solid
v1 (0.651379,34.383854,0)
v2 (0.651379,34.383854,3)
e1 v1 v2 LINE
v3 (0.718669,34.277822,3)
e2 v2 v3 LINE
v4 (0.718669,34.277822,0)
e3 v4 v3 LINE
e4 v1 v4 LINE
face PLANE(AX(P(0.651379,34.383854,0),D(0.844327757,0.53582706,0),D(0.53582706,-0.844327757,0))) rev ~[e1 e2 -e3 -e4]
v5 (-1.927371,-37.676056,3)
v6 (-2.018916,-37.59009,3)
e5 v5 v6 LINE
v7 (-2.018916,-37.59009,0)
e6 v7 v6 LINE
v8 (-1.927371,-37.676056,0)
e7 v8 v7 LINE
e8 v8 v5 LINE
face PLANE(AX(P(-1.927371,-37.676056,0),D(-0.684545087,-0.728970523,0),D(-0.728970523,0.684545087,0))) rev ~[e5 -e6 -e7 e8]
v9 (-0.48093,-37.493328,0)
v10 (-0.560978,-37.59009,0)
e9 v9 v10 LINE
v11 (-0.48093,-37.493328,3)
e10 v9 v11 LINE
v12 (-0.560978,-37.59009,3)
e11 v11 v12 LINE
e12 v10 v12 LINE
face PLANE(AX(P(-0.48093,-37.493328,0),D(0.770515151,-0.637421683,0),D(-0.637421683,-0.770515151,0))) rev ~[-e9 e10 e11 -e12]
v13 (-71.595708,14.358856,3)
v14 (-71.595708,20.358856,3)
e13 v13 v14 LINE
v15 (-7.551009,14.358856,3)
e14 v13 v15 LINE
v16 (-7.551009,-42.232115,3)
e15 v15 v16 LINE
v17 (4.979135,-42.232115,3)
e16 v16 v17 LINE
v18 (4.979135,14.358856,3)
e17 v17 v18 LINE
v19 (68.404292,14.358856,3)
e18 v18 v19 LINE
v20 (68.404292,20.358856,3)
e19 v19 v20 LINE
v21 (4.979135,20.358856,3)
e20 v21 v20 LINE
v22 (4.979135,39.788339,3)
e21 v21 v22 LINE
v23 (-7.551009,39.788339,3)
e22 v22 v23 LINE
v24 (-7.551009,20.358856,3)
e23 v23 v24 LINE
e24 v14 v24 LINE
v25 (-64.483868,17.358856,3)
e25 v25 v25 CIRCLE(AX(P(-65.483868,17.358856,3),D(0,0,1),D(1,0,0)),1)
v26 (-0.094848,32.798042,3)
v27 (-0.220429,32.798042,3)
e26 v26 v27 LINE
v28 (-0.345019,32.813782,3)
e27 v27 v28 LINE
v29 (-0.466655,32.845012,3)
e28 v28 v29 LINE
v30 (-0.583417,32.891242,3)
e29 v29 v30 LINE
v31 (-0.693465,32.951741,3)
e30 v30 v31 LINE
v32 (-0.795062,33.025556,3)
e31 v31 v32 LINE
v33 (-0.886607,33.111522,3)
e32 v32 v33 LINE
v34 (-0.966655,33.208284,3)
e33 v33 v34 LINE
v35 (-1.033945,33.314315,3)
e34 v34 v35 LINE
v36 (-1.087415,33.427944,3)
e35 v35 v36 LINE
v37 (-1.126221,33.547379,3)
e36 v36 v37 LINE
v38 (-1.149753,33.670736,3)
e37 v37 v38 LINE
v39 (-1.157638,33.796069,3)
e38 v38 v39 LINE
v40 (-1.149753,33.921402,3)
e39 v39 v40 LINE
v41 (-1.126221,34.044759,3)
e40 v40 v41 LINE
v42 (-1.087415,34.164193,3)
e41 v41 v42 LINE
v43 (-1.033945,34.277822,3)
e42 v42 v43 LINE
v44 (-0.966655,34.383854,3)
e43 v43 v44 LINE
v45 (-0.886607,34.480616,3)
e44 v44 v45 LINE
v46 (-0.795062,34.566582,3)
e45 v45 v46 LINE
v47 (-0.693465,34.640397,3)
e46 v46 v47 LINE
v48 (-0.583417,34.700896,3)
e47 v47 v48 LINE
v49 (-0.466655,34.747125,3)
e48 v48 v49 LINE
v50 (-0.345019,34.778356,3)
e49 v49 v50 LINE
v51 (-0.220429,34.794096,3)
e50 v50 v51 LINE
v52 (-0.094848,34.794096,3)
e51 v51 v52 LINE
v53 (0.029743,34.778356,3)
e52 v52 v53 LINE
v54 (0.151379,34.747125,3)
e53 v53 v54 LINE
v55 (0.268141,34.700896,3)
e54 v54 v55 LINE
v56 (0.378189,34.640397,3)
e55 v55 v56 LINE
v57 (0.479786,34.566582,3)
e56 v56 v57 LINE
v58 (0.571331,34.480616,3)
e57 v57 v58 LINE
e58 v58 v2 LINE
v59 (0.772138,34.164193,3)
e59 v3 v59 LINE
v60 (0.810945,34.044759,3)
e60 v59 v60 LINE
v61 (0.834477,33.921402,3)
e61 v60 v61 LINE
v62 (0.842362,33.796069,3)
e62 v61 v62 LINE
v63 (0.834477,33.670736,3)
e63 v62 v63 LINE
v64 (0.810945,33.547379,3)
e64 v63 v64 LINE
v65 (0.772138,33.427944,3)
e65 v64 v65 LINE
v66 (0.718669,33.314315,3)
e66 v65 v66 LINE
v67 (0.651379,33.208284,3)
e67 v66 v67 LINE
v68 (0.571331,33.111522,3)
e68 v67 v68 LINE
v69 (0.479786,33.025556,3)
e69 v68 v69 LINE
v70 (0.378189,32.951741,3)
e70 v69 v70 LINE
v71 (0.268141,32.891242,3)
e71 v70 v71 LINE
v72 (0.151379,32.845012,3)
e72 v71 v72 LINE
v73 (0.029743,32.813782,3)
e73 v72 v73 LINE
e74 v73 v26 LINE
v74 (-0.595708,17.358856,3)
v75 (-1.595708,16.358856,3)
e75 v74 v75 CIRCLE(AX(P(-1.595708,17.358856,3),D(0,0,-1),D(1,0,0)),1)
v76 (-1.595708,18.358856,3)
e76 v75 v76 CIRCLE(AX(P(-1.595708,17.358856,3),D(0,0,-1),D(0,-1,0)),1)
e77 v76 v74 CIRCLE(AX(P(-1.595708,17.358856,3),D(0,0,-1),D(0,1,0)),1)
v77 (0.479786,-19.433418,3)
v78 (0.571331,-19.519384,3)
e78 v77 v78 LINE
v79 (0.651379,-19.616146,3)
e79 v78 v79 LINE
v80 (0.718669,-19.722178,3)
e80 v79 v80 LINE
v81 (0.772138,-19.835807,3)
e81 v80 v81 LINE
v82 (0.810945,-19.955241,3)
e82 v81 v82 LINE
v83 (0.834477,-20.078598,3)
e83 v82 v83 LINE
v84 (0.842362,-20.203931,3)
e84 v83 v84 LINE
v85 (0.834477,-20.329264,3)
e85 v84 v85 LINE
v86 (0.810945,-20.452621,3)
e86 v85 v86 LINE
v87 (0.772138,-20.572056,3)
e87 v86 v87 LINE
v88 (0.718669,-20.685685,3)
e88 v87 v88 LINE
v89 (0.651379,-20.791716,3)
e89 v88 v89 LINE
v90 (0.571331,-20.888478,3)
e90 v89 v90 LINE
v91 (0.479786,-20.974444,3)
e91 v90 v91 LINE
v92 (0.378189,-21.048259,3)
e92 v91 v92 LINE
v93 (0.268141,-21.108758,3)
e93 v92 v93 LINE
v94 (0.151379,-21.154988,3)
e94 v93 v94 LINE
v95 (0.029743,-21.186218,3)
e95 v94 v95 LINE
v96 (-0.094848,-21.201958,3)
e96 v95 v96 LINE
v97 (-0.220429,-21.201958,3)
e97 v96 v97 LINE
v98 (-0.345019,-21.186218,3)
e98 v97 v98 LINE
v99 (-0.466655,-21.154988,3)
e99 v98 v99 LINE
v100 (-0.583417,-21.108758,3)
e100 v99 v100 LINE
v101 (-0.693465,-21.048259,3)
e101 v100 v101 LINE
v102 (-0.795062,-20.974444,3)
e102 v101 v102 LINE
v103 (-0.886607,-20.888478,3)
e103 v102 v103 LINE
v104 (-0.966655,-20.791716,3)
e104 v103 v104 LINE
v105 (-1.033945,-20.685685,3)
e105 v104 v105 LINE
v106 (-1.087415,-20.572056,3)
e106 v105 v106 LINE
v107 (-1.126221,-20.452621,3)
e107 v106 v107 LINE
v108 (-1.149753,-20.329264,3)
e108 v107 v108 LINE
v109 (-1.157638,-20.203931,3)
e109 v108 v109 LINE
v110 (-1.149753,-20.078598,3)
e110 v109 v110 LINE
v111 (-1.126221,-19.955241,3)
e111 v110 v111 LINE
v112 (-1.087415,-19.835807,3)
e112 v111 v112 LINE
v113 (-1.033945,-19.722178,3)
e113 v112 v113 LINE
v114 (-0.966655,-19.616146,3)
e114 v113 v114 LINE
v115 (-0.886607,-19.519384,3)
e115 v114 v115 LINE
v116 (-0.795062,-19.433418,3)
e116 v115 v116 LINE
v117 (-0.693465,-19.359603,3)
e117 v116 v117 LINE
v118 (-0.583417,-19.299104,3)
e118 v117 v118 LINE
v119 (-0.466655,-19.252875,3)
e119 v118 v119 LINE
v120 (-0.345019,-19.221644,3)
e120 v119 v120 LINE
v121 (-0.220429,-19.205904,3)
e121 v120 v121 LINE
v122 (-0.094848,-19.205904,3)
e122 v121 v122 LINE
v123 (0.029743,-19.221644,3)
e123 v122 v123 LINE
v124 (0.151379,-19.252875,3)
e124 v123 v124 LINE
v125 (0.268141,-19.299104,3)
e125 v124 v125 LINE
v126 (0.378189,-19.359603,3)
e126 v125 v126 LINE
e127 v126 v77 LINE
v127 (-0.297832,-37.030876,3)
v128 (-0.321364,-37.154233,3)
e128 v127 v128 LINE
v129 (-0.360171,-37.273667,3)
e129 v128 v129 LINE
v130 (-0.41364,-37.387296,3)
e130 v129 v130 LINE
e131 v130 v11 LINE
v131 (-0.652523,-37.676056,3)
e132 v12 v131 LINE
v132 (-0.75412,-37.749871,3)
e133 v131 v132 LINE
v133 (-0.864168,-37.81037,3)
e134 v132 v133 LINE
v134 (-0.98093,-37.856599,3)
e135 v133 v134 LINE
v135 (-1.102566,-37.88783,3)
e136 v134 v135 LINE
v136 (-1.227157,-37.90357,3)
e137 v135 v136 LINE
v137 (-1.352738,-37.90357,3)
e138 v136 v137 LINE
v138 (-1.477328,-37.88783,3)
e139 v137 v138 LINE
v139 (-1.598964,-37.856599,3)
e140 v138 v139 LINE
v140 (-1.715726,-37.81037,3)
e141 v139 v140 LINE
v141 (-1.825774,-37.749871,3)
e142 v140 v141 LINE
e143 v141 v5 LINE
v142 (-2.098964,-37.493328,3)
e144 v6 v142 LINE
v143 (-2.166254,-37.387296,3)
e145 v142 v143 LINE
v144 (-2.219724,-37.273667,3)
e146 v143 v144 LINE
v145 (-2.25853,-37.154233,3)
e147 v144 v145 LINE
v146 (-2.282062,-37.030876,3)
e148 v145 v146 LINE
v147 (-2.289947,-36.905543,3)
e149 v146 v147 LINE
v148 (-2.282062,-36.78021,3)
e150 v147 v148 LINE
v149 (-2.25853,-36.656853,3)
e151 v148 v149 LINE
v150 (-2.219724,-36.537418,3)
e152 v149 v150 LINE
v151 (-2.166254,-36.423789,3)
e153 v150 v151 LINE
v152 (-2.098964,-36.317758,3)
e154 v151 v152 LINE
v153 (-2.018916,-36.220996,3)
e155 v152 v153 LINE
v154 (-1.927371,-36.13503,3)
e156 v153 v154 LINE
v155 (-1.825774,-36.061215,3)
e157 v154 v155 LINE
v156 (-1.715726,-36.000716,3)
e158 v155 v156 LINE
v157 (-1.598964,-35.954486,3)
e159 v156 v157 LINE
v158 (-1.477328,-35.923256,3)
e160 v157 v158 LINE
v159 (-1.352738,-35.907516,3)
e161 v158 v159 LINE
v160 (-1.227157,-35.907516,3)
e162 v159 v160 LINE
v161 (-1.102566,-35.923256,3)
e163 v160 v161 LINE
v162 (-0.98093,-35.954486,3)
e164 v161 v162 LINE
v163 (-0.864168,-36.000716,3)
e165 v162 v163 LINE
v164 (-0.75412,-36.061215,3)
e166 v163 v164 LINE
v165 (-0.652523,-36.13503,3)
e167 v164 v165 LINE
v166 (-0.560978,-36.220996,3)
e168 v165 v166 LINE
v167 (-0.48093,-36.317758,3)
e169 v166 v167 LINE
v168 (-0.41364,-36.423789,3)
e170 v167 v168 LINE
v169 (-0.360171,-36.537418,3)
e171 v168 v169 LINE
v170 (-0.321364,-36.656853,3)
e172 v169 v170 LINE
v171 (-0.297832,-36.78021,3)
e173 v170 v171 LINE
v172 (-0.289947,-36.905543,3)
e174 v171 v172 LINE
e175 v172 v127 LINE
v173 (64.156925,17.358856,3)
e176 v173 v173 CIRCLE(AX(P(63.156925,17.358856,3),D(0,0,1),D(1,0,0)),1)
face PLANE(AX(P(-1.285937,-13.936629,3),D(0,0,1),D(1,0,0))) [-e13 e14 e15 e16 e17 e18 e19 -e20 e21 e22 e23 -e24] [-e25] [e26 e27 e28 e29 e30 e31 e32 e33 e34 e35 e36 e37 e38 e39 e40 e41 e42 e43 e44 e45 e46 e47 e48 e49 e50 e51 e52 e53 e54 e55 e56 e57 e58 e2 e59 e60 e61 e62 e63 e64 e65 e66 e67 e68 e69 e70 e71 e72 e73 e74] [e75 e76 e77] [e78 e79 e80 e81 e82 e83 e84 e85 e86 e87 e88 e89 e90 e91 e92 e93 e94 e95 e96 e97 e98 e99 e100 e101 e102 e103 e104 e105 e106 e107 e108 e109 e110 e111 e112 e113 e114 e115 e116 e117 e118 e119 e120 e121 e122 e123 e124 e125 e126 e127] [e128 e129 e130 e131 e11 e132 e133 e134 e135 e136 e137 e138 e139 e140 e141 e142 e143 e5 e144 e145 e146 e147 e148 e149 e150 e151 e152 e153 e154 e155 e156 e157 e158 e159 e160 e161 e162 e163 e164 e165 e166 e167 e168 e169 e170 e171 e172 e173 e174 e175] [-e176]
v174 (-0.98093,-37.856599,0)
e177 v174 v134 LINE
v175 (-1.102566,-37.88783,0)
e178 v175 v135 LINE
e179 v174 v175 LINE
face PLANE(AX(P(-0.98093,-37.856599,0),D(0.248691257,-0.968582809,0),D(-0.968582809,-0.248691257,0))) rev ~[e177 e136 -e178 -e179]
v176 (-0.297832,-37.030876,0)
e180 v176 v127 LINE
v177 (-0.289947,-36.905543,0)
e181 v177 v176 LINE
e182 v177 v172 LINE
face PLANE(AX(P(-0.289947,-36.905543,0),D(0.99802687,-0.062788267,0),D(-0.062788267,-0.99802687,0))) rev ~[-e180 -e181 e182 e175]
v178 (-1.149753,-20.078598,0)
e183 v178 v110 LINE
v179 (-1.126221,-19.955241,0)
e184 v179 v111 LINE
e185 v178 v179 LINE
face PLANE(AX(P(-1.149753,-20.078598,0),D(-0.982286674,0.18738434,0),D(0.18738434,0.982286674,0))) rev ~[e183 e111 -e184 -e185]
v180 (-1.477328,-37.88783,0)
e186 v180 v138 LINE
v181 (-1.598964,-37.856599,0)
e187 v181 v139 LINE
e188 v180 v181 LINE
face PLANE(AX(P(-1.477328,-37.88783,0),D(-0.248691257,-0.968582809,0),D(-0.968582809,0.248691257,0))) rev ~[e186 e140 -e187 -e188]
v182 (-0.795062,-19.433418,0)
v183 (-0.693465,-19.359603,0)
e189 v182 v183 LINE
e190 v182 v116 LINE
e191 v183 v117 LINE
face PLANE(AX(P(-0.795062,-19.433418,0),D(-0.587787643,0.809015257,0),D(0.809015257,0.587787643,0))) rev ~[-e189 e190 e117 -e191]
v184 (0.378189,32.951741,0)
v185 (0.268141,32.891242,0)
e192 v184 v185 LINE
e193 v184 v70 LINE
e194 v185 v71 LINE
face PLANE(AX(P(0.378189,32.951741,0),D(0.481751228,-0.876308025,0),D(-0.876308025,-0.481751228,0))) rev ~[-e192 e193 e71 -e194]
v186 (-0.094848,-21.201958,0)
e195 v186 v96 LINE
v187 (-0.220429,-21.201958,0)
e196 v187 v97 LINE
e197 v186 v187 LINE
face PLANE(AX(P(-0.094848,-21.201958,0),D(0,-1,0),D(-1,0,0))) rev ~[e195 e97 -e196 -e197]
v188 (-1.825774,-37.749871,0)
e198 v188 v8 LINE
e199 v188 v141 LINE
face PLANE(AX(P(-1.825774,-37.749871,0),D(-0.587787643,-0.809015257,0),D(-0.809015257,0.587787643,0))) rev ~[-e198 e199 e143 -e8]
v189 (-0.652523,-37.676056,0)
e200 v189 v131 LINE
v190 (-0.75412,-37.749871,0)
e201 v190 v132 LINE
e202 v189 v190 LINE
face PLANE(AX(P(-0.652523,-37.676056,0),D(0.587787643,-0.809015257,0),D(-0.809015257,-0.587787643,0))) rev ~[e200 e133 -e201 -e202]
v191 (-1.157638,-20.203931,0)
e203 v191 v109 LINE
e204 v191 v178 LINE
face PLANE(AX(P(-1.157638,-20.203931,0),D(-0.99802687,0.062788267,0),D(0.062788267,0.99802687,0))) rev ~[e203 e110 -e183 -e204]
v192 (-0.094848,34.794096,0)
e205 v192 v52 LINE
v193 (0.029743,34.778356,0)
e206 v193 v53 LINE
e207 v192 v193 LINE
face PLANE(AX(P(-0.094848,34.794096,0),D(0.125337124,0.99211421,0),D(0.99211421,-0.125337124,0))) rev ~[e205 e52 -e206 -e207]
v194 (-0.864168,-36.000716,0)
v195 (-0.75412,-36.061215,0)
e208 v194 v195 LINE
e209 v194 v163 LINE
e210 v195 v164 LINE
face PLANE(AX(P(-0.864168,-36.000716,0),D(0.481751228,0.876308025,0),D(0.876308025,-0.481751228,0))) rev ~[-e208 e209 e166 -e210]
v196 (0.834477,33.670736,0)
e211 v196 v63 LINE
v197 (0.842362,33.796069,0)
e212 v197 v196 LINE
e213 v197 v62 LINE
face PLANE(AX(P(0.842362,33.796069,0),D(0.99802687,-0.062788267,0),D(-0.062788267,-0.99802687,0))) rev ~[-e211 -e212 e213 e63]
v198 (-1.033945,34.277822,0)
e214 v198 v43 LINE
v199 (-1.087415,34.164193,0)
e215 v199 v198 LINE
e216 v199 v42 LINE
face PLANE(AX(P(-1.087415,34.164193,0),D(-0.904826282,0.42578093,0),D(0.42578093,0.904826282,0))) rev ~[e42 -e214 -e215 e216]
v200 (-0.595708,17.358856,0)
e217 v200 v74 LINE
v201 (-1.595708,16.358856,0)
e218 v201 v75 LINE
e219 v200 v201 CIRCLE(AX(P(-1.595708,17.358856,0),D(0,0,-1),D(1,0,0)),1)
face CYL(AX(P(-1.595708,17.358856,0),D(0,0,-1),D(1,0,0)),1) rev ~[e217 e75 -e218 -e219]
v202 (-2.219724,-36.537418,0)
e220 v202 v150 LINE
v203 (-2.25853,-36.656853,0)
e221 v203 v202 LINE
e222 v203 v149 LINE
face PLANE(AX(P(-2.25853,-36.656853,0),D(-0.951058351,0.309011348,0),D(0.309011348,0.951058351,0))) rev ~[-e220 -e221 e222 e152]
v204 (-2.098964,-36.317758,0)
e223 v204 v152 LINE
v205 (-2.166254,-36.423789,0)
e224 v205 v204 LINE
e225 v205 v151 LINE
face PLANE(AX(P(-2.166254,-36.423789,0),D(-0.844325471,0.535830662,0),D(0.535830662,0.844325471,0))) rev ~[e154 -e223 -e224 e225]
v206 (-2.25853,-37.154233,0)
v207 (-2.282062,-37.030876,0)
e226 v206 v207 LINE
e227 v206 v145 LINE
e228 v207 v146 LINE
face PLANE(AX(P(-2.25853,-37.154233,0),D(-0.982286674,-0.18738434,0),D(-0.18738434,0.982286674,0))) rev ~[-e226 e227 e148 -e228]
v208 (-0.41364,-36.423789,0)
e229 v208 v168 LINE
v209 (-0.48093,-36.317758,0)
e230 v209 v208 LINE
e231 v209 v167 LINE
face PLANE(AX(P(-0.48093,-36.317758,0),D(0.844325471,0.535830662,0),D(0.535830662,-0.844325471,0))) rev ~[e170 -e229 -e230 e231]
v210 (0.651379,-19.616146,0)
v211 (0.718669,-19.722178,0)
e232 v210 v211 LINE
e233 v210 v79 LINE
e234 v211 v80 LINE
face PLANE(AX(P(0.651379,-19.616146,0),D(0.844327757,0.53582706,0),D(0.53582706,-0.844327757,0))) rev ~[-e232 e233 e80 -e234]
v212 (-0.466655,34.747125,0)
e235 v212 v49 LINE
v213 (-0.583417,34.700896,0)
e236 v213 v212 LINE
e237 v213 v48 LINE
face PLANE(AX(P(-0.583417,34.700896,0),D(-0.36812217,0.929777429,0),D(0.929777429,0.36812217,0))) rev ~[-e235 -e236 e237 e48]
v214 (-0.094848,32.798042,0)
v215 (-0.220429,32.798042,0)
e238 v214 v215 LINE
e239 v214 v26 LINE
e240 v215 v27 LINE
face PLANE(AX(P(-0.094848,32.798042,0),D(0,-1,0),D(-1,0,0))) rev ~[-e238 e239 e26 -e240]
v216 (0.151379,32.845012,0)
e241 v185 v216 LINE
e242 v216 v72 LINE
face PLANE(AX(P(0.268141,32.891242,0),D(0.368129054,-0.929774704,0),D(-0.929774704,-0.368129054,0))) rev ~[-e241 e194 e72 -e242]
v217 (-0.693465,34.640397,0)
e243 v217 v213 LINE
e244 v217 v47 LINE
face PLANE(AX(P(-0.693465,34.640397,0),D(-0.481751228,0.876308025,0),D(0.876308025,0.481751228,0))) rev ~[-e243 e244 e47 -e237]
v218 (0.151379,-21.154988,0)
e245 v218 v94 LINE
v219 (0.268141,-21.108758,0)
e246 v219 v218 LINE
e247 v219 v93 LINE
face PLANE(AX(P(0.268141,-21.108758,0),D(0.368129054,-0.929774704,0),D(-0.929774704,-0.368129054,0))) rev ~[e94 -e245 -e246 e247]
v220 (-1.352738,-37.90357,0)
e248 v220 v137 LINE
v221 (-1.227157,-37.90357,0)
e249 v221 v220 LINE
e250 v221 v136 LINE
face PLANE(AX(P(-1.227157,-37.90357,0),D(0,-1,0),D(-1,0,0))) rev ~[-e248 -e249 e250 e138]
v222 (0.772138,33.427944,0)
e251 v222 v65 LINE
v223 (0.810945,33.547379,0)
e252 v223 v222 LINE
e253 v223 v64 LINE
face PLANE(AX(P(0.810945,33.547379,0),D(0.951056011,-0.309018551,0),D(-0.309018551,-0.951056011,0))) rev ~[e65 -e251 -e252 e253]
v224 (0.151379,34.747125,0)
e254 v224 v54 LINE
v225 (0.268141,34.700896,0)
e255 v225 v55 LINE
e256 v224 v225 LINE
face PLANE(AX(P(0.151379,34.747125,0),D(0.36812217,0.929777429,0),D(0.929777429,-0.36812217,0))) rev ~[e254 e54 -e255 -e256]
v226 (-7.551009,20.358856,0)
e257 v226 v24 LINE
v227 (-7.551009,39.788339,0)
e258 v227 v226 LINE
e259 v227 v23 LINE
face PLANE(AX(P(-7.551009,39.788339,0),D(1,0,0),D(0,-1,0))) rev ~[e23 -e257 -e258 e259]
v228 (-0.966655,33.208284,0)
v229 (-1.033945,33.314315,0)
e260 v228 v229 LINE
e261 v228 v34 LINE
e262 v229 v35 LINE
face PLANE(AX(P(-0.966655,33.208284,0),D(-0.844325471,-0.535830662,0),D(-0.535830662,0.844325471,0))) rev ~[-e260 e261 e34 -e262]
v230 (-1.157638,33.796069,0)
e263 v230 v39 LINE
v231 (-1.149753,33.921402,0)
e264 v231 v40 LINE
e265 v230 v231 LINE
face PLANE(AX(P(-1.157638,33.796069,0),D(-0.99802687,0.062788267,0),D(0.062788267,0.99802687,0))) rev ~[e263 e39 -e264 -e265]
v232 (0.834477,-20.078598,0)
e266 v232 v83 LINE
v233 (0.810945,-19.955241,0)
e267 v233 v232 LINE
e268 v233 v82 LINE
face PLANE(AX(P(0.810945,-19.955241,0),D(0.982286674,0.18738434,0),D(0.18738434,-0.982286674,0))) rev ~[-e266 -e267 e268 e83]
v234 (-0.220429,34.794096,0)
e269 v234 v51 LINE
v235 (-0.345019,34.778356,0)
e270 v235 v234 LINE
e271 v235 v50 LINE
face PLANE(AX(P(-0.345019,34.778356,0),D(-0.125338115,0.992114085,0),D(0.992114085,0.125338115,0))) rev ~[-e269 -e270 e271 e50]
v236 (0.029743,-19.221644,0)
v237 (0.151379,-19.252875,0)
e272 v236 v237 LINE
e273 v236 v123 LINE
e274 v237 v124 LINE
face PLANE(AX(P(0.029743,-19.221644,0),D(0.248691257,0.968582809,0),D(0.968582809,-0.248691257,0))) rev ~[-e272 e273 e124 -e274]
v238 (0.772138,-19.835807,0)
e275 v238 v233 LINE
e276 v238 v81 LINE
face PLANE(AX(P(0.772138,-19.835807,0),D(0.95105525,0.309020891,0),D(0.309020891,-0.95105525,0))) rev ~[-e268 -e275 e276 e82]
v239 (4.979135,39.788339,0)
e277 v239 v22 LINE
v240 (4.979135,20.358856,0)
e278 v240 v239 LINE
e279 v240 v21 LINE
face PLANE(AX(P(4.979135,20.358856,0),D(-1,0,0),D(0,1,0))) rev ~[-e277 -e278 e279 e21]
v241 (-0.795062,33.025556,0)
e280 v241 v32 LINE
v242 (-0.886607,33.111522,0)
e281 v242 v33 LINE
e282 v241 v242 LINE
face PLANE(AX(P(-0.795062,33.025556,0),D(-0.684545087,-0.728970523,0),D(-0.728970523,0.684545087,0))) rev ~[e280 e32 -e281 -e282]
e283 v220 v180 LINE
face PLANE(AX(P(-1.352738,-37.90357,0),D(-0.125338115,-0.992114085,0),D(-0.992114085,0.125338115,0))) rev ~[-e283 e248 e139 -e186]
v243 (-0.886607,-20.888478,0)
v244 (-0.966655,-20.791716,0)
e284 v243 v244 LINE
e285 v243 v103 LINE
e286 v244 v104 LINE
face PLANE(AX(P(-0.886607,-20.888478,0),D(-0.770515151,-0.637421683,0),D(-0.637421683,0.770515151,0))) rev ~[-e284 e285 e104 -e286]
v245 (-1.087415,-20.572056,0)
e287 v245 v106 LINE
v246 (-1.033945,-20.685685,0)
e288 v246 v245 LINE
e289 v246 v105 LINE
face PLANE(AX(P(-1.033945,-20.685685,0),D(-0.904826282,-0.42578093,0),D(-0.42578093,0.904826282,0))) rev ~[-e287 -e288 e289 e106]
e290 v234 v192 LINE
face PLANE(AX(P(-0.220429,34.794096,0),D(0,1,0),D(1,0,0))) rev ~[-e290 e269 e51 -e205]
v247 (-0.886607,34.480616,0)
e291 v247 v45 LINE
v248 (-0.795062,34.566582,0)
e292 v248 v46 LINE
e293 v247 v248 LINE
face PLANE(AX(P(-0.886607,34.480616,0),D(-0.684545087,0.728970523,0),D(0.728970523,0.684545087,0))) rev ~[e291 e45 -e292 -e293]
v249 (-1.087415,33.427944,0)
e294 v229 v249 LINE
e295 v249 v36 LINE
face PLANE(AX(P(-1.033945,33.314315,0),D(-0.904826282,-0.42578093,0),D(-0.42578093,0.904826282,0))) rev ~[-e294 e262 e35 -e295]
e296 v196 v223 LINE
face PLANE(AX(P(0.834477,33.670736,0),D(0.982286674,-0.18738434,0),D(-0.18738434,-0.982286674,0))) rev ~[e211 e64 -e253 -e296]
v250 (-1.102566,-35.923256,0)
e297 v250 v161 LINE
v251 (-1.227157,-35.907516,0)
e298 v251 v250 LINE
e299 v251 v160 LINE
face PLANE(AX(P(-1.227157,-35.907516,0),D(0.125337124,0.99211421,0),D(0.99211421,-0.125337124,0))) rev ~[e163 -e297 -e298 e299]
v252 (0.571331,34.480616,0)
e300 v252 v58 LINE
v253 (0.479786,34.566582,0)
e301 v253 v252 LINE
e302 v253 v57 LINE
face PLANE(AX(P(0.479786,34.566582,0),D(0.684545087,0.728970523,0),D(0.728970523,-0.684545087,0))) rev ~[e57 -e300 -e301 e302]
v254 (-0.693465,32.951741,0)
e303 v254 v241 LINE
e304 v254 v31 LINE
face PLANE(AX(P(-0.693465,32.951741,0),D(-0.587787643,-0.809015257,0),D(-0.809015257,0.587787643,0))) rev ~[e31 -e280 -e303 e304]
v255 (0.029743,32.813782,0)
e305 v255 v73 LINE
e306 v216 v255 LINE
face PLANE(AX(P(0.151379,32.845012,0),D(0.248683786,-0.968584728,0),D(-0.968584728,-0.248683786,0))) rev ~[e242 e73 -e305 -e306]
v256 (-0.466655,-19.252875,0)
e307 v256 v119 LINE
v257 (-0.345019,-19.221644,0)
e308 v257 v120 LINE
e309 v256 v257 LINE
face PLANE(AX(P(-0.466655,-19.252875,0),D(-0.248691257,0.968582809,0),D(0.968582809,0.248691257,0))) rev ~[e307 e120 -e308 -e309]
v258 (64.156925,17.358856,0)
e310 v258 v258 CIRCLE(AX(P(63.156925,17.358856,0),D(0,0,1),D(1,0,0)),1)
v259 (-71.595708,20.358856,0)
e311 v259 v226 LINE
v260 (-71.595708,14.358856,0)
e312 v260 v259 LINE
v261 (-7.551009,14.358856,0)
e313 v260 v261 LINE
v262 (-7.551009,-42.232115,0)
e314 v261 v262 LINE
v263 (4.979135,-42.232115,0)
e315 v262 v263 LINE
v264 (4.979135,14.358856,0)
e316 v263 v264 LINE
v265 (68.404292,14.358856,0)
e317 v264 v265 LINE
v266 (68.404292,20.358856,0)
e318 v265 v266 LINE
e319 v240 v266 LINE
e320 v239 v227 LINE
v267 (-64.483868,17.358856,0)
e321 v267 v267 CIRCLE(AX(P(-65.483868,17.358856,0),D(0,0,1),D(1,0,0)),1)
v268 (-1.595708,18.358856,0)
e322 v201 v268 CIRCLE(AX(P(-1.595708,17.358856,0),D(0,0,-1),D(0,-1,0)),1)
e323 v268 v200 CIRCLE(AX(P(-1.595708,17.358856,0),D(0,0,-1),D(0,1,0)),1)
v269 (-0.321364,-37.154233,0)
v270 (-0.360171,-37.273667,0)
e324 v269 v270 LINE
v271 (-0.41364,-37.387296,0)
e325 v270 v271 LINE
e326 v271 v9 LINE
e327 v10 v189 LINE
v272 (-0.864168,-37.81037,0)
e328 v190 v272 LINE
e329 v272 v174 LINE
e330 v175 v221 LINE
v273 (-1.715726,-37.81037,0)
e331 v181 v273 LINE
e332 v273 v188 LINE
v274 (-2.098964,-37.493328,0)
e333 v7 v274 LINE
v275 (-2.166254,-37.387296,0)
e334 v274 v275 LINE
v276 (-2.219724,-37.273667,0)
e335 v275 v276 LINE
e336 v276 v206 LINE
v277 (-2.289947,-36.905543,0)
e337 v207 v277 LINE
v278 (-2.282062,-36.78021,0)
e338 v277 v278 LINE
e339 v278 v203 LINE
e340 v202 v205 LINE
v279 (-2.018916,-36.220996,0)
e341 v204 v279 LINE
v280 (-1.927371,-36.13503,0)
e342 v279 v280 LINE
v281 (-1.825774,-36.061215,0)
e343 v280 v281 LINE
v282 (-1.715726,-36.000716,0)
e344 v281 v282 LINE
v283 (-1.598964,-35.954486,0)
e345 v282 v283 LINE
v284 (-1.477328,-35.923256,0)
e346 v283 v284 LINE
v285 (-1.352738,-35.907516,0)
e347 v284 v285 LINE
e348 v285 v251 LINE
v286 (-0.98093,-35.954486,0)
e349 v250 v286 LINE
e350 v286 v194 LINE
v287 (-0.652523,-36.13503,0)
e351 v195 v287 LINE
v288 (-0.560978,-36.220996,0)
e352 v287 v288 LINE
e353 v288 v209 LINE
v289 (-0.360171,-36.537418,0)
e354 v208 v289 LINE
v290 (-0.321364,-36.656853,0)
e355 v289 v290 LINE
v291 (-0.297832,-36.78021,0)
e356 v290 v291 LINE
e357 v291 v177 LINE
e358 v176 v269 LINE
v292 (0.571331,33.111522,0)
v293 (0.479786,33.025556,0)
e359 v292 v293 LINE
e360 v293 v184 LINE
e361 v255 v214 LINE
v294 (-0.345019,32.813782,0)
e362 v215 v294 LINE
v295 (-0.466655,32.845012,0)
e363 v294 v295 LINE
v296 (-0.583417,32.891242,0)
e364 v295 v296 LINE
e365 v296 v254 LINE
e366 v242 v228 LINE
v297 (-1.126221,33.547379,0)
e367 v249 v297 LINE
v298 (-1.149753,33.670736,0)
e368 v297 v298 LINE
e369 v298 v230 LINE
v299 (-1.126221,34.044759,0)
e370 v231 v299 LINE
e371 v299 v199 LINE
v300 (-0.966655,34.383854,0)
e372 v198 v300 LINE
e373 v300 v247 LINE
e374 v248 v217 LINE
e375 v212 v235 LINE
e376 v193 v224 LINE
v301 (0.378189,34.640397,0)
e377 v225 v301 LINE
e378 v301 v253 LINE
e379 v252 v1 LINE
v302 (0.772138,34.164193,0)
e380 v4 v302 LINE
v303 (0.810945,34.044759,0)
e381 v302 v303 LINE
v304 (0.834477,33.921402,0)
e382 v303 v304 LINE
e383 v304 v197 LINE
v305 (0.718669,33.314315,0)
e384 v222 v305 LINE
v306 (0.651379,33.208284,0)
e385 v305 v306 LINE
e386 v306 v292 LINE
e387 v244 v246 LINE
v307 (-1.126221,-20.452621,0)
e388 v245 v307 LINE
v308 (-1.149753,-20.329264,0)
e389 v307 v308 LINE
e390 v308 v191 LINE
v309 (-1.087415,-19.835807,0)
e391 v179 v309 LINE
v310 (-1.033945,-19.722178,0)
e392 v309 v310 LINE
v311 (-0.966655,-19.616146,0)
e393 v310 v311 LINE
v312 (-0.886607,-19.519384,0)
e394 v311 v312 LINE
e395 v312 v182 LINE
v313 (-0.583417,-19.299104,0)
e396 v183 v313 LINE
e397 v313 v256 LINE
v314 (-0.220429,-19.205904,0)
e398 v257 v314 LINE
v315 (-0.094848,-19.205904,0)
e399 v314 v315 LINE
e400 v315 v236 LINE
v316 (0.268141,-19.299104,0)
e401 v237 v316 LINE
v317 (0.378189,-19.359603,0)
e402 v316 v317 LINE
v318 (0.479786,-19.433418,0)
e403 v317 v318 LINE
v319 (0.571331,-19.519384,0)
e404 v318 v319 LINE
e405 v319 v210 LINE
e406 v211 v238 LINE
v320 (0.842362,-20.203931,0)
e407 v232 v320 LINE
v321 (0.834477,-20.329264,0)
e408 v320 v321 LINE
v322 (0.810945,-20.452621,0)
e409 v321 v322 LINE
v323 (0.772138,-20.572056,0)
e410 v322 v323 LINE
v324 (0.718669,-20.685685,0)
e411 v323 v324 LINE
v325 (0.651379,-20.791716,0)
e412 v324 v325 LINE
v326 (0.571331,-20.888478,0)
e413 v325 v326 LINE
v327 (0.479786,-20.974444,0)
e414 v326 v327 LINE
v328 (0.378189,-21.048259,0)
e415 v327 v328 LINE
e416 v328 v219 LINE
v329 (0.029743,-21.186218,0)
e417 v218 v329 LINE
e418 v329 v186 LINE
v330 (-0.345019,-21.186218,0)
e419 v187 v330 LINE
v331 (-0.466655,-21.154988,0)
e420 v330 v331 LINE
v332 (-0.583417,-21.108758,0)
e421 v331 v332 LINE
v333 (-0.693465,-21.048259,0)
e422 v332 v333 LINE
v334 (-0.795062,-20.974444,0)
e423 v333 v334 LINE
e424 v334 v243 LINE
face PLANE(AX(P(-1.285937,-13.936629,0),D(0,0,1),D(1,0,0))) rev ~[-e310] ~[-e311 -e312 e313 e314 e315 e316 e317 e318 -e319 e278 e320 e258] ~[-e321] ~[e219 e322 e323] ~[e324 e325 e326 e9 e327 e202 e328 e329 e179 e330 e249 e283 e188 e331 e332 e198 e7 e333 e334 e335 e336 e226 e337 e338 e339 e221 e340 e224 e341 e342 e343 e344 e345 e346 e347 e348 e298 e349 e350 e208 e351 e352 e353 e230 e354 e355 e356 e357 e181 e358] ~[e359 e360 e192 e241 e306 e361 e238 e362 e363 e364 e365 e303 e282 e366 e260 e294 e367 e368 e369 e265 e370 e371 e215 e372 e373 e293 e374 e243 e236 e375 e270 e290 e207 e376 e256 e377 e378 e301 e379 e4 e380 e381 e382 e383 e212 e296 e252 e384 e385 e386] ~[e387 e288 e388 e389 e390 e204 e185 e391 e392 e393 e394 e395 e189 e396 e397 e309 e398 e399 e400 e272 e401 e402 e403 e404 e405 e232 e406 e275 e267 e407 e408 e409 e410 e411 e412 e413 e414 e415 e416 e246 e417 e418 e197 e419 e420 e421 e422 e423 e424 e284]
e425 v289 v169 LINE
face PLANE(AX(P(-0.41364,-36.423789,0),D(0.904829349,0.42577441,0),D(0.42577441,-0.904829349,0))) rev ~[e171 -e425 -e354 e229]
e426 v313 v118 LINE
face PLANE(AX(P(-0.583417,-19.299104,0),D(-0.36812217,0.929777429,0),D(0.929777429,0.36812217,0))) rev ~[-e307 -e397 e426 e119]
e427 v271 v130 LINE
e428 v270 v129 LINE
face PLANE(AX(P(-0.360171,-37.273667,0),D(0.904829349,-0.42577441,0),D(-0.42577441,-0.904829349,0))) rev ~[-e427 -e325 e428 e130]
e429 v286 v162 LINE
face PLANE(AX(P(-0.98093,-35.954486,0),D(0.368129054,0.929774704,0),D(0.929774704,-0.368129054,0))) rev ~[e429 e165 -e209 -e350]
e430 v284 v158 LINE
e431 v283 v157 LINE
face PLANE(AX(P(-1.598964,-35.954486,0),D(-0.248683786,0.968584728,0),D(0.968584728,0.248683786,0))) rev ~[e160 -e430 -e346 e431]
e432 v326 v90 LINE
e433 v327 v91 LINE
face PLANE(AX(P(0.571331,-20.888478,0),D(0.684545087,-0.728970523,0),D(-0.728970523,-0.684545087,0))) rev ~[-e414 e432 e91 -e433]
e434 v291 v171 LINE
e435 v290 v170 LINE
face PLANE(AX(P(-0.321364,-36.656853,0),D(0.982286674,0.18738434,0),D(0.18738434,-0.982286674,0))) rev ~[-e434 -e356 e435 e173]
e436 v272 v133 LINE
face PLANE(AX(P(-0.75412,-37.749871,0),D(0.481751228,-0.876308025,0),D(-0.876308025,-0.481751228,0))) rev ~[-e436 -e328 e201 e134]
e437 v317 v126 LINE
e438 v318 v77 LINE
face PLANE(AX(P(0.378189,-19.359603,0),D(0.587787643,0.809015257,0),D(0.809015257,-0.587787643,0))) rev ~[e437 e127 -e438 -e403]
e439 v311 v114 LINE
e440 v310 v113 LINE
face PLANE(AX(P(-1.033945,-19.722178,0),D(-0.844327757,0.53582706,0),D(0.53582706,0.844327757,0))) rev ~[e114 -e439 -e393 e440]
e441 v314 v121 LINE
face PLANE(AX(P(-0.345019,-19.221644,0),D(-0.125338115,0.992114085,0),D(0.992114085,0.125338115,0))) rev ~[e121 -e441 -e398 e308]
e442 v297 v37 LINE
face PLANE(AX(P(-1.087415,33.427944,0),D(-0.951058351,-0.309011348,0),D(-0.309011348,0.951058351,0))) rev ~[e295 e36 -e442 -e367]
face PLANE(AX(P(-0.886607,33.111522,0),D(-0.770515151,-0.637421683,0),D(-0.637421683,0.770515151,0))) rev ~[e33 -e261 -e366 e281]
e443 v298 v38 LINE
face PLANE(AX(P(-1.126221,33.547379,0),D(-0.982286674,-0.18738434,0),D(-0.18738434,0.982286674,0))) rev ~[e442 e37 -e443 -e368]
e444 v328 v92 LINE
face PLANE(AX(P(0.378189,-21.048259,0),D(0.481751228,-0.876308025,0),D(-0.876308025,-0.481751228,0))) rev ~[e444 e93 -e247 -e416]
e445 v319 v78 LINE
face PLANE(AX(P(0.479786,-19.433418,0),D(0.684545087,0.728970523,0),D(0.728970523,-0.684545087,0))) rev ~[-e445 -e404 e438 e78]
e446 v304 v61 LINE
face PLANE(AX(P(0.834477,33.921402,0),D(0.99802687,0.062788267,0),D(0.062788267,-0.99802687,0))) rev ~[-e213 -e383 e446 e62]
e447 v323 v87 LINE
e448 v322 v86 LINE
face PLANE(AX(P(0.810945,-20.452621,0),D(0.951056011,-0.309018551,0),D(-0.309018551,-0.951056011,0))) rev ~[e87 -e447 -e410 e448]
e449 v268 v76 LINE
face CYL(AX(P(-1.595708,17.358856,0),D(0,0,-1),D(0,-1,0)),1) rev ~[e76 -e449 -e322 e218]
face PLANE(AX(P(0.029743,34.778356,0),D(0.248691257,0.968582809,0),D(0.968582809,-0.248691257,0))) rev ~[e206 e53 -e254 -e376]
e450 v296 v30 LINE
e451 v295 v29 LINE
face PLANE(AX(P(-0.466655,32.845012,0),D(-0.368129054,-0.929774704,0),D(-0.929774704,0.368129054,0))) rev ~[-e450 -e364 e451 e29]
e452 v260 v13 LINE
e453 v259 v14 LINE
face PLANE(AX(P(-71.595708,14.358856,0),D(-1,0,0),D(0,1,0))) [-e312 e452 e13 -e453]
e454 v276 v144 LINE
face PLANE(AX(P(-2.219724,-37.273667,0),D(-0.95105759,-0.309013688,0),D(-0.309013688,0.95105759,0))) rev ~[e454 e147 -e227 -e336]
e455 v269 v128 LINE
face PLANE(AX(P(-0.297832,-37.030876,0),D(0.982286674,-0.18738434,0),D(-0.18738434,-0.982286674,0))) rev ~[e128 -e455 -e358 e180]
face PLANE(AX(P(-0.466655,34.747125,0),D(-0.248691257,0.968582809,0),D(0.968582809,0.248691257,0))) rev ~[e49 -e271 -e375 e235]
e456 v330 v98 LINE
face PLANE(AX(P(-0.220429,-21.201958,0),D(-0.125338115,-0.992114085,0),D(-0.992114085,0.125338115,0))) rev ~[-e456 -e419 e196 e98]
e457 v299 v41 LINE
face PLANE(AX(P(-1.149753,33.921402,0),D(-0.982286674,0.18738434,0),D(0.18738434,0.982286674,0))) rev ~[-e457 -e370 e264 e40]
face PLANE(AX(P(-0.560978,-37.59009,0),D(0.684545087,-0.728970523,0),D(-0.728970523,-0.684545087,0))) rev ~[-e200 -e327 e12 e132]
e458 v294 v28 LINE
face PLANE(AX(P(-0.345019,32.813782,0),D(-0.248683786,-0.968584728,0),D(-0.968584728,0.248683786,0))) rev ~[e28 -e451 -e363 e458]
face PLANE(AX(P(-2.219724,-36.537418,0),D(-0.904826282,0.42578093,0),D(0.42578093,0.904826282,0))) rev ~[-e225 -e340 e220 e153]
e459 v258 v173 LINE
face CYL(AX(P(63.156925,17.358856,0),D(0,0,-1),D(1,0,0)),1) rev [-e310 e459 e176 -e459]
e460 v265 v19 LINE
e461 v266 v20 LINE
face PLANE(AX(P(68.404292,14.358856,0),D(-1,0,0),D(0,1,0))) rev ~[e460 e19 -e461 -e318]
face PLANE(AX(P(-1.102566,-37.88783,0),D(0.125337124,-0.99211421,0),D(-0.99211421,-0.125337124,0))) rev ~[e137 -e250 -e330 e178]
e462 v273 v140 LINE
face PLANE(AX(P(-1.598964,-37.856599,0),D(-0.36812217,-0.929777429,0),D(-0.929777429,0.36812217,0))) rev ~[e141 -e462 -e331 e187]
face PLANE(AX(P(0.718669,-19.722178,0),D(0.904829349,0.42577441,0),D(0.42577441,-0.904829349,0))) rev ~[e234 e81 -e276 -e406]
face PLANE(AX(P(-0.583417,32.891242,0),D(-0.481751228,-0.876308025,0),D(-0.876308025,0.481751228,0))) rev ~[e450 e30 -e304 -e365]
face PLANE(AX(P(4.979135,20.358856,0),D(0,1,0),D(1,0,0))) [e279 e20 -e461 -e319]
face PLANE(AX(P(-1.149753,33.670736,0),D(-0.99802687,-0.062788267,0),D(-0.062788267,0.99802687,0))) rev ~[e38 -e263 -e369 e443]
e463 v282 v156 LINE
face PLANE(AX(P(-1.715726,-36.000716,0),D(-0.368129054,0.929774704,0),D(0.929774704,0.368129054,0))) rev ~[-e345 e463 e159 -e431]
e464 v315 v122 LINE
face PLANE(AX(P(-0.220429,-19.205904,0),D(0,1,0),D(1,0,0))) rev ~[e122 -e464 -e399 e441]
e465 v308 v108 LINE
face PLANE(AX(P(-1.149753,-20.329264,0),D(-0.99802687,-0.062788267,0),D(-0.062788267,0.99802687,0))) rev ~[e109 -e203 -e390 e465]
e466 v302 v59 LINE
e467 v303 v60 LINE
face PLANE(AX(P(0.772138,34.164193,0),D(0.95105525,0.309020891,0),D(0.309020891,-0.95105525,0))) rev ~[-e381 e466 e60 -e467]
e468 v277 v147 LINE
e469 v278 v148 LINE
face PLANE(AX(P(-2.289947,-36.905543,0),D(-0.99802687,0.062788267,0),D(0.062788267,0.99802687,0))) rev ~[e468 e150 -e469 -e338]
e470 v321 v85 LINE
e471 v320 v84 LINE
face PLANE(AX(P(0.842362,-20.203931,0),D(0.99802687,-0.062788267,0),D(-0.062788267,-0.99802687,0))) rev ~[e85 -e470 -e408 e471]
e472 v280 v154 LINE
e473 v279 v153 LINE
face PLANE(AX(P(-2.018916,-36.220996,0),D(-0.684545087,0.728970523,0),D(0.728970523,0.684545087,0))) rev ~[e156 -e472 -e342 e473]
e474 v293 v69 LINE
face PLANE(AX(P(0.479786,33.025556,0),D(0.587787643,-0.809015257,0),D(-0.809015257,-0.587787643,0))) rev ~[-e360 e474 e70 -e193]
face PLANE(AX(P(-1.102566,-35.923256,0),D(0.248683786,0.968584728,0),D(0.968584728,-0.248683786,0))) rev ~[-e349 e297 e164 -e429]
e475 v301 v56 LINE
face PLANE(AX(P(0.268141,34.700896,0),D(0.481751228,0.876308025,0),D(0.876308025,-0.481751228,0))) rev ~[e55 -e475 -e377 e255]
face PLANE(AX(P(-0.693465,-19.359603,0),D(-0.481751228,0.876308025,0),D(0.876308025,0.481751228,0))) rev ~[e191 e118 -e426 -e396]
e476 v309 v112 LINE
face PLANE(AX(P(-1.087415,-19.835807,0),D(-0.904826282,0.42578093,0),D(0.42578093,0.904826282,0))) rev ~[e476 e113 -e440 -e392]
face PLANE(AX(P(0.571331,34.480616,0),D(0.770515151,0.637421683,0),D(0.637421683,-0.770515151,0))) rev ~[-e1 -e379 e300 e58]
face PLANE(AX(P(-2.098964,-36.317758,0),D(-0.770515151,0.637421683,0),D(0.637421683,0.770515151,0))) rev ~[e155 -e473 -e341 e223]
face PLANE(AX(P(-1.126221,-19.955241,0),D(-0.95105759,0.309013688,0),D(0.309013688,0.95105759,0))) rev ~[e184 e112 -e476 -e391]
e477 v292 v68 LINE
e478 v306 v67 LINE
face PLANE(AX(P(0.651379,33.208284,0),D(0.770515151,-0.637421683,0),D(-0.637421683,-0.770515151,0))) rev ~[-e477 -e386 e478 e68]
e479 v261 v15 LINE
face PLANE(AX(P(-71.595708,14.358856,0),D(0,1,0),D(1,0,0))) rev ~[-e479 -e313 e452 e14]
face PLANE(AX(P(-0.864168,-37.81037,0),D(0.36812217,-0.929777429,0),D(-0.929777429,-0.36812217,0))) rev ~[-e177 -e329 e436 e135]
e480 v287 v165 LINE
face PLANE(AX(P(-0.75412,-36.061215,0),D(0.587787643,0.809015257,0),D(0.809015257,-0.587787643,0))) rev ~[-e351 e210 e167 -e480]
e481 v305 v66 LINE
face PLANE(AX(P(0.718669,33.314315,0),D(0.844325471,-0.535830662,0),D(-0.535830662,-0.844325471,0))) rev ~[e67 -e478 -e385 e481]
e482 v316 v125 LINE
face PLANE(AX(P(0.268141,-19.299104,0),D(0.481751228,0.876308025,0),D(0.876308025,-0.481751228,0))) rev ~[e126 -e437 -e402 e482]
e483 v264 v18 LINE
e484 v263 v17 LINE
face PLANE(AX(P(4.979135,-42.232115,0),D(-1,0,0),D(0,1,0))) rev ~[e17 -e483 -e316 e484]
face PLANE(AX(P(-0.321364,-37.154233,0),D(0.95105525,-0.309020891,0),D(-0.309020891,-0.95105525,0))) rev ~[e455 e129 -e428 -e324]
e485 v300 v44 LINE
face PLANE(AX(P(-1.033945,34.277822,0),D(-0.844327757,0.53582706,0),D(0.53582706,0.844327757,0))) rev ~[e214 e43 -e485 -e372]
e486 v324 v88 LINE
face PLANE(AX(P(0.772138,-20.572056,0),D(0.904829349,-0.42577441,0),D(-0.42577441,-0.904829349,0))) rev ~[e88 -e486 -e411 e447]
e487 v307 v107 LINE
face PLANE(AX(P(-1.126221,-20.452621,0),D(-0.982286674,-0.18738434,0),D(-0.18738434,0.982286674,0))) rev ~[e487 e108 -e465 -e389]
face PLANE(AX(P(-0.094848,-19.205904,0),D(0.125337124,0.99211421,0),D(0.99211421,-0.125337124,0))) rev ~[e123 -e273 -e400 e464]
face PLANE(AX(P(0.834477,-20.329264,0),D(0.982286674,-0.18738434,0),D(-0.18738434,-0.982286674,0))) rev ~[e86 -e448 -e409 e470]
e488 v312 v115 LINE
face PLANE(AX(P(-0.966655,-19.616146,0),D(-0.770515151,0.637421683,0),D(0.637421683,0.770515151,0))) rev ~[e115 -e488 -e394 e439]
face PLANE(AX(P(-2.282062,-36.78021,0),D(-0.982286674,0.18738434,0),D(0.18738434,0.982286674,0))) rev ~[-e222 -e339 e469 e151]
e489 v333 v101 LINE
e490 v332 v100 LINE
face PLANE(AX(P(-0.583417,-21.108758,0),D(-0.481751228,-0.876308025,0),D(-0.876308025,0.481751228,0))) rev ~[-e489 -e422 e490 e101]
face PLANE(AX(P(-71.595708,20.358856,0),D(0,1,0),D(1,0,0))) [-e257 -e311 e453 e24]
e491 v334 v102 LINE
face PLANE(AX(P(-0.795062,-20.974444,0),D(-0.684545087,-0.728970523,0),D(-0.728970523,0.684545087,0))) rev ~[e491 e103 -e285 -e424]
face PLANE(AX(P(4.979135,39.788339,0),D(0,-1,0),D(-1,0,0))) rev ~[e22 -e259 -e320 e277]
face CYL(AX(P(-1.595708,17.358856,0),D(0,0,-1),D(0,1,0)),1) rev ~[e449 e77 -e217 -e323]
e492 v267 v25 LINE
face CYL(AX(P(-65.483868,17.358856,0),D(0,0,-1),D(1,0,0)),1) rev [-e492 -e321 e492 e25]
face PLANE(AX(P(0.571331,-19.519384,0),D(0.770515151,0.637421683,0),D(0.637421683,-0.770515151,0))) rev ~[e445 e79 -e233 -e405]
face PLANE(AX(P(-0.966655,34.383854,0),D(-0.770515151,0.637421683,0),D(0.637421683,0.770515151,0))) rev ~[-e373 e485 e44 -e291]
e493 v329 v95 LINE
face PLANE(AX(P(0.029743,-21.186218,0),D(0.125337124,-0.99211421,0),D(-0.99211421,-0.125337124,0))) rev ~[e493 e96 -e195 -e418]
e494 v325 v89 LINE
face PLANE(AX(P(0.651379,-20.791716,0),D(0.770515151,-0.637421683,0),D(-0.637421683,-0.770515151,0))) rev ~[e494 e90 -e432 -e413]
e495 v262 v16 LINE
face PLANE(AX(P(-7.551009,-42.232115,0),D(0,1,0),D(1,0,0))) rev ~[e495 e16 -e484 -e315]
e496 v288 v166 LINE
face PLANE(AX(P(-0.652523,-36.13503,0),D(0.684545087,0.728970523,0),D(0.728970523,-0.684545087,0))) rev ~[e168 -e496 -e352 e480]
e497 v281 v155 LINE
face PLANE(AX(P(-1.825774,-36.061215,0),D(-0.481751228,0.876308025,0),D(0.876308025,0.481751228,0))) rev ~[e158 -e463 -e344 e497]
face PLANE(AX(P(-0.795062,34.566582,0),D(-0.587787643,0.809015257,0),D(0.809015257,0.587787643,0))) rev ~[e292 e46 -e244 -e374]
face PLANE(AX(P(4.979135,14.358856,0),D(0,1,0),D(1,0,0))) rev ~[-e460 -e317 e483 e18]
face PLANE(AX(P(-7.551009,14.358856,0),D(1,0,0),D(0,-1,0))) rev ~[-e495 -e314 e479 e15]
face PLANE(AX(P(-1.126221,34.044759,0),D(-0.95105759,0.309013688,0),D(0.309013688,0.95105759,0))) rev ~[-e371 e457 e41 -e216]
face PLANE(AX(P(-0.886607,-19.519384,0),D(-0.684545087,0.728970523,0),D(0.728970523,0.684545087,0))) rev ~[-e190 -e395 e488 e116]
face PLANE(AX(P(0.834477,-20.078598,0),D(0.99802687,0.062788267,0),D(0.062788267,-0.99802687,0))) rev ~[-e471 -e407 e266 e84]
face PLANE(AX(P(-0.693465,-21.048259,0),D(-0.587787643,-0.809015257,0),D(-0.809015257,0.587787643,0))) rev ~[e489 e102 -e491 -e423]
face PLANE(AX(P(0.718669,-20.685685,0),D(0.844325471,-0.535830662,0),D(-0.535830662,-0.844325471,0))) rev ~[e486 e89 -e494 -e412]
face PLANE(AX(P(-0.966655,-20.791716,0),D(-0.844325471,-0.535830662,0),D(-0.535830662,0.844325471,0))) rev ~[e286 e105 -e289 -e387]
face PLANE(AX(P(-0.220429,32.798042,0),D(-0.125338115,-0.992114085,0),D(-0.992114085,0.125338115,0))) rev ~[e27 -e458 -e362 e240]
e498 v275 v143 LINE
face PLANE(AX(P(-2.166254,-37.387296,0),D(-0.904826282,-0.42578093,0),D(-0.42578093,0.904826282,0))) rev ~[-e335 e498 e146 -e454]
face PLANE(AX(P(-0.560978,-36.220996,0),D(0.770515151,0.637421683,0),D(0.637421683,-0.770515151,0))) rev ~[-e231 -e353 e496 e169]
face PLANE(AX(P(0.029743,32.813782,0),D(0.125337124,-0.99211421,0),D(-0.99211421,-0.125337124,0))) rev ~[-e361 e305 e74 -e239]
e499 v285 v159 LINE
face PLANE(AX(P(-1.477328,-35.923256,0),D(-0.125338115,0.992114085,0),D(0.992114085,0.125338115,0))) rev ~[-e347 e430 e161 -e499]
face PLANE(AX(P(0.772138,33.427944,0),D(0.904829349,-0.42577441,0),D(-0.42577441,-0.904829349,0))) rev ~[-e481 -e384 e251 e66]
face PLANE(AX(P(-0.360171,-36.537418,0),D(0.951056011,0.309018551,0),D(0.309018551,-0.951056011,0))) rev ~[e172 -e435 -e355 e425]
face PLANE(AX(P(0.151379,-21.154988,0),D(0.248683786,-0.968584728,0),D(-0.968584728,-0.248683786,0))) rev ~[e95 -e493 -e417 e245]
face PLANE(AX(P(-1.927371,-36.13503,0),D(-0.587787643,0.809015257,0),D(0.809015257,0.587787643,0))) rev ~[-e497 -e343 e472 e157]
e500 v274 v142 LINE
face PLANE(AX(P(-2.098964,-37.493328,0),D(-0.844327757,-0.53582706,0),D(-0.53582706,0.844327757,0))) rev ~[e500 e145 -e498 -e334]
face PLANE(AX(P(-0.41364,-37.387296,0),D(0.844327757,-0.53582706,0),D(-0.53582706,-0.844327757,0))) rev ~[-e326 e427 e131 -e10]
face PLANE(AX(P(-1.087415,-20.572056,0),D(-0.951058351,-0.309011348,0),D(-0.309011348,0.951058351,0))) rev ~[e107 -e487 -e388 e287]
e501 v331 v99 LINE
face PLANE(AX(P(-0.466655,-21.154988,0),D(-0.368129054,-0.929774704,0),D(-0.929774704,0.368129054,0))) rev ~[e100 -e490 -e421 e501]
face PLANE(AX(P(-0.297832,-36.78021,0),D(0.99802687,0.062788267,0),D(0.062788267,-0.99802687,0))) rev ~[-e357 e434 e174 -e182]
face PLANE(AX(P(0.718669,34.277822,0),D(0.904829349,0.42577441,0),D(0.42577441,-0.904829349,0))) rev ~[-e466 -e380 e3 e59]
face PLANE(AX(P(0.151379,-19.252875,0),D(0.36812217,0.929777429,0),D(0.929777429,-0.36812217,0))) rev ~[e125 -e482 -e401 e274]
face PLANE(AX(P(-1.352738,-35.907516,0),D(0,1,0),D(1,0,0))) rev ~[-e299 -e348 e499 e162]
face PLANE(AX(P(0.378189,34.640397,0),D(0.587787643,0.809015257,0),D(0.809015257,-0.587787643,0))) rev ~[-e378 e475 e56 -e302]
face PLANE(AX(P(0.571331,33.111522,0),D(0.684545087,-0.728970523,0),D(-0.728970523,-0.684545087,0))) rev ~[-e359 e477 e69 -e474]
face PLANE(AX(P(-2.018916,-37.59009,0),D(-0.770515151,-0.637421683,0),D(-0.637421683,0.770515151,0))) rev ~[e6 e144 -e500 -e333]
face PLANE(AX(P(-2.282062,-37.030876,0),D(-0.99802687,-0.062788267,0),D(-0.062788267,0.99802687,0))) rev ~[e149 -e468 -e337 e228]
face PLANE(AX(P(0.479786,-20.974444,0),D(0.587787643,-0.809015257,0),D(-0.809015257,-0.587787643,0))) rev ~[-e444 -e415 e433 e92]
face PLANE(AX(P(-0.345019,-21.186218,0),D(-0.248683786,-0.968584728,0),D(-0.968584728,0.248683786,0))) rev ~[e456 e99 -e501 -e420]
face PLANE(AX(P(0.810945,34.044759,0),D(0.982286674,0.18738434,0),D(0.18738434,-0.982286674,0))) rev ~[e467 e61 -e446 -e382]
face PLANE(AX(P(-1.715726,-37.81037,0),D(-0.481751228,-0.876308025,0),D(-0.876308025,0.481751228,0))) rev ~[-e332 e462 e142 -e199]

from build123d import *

# Parameters (mm, degrees)
F0_W     = 64.0446986989
F0_H     = 6
F0_R     = 1
F0_W_2   = 63.4251574627
F1_DEPTH = 3


# Not quite as in the source:
# - a feature names something its author has since deleted; it is built from what else it names


with BuildPart() as f1:
    # F0 (on Top) → F1 (new body)
    with BuildSketch(Plane.XY):
        Polygon((-7.5510093011, -42.2321148217), (-1.289947, -42.2321148217), (4.9791345373, -42.2321148217), (4.9791345373, 14.358856), (-1.595708, 14.358856), (-7.5510093011, 14.358856), align=None)
        Polygon((-0.297832, -36.78021), (-0.289947, -36.905543), (-0.297832, -37.030876), (-0.321364, -37.154233), (-0.360171, -37.273667), (-0.41364, -37.387296), (-0.48093, -37.493328), (-0.560978, -37.59009), (-0.652523, -37.676056), (-0.75412, -37.749871), (-0.864168, -37.81037), (-0.98093, -37.856599), (-1.102566, -37.88783), (-1.227157, -37.90357), (-1.352738, -37.90357), (-1.477328, -37.88783), (-1.598964, -37.856599), (-1.715726, -37.81037), (-1.825774, -37.749871), (-1.927371, -37.676056), (-2.018916, -37.59009), (-2.098964, -37.493328), (-2.166254, -37.387296), (-2.219724, -37.273667), (-2.25853, -37.154233), (-2.282062, -37.030876), (-2.289947, -36.905543), (-2.282062, -36.78021), (-2.25853, -36.656853), (-2.219724, -36.537418), (-2.166254, -36.423789), (-2.098964, -36.317758), (-2.018916, -36.220996), (-1.927371, -36.13503), (-1.825774, -36.061215), (-1.715726, -36.000716), (-1.598964, -35.954486), (-1.477328, -35.923256), (-1.352738, -35.907516), (-1.227157, -35.907516), (-1.102566, -35.923256), (-0.98093, -35.954486), (-0.864168, -36.000716), (-0.75412, -36.061215), (-0.652523, -36.13503), (-0.560978, -36.220996), (-0.48093, -36.317758), (-0.41364, -36.423789), (-0.360171, -36.537418), (-0.321364, -36.656853), align=None, mode=Mode.SUBTRACT)
        Polygon((0.834477, -20.078598), (0.842362, -20.203931), (0.834477, -20.329264), (0.810945, -20.452621), (0.772138, -20.572056), (0.718669, -20.685685), (0.651379, -20.791716), (0.571331, -20.888478), (0.479786, -20.974444), (0.378189, -21.048259), (0.268141, -21.108758), (0.151379, -21.154988), (0.029743, -21.186218), (-0.094848, -21.201958), (-0.220429, -21.201958), (-0.345019, -21.186218), (-0.466655, -21.154988), (-0.583417, -21.108758), (-0.693465, -21.048259), (-0.795062, -20.974444), (-0.886607, -20.888478), (-0.966655, -20.791716), (-1.033945, -20.685685), (-1.087415, -20.572056), (-1.126221, -20.452621), (-1.149753, -20.329264), (-1.157638, -20.203931), (-1.149753, -20.078598), (-1.126221, -19.955241), (-1.087415, -19.835807), (-1.033945, -19.722178), (-0.966655, -19.616146), (-0.886607, -19.519384), (-0.795062, -19.433418), (-0.693465, -19.359603), (-0.583417, -19.299104), (-0.466655, -19.252875), (-0.345019, -19.221644), (-0.220429, -19.205904), (-0.094848, -19.205904), (0.029743, -19.221644), (0.151379, -19.252875), (0.268141, -19.299104), (0.378189, -19.359603), (0.479786, -19.433418), (0.571331, -19.519384), (0.651379, -19.616146), (0.718669, -19.722178), (0.772138, -19.835807), (0.810945, -19.955241), align=None, mode=Mode.SUBTRACT)
        Polygon((-7.5510093011, 39.788339287), (-7.5510093011, 20.358856), (-1.595708, 20.358856), (4.9791345373, 20.358856), (4.9791345373, 28.8824737072), (4.9791345373, 39.788339287), (-1.289947, 39.788339287), align=None)
        Polygon((0.834477, 33.921402), (0.842362, 33.796069), (0.834477, 33.670736), (0.810945, 33.547379), (0.772138, 33.427944), (0.718669, 33.314315), (0.651379, 33.208284), (0.571331, 33.111522), (0.479786, 33.025556), (0.378189, 32.951741), (0.268141, 32.891242), (0.151379, 32.845012), (0.029743, 32.813782), (-0.094848, 32.798042), (-0.220429, 32.798042), (-0.345019, 32.813782), (-0.466655, 32.845012), (-0.583417, 32.891242), (-0.693465, 32.951741), (-0.795062, 33.025556), (-0.886607, 33.111522), (-0.966655, 33.208284), (-1.033945, 33.314315), (-1.087415, 33.427944), (-1.126221, 33.547379), (-1.149753, 33.670736), (-1.157638, 33.796069), (-1.149753, 33.921402), (-1.126221, 34.044759), (-1.087415, 34.164193), (-1.033945, 34.277822), (-0.966655, 34.383854), (-0.886607, 34.480616), (-0.795062, 34.566582), (-0.693465, 34.640397), (-0.583417, 34.700896), (-0.466655, 34.747125), (-0.345019, 34.778356), (-0.220429, 34.794096), (-0.094848, 34.794096), (0.029743, 34.778356), (0.151379, 34.747125), (0.268141, 34.700896), (0.378189, 34.640397), (0.479786, 34.566582), (0.571331, 34.480616), (0.651379, 34.383854), (0.718669, 34.277822), (0.772138, 34.164193), (0.810945, 34.044759), align=None, mode=Mode.SUBTRACT)
        with Locations((-39.5733586505, 17.358856)):
            Rectangle(F0_W, F0_H)
        with Locations((-65.4838681221, 17.358856)):
            Circle(F0_R, mode=Mode.SUBTRACT)
        with Locations((36.6917132686, 17.358856)):
            Rectangle(F0_W_2, F0_H)
        with Locations((63.1569251418, 17.358856)):
            Circle(F0_R, mode=Mode.SUBTRACT)
        with BuildLine():
            Line((-7.5510093011, 20.358856), (-7.5510093011, 14.358856))
            Line((-7.5510093011, 14.358856), (-1.595708, 14.358856))
            Line((-1.595708, 14.358856), (-1.595708, 16.358856))
            ThreePointArc((-1.595708, 16.358856), (-2.595708, 17.358856), (-1.595708, 18.358856))
            Line((-1.595708, 18.358856), (-1.595708, 20.358856))
            Line((-1.595708, 20.358856), (-7.5510093011, 20.358856))
        make_face()
        with BuildLine():
            Line((-1.595708, 14.358856), (4.9791345373, 14.358856))
            Line((4.9791345373, 14.358856), (4.9791345373, 20.358856))
            Line((4.9791345373, 20.358856), (-1.595708, 20.358856))
            Line((-1.595708, 20.358856), (-1.595708, 18.358856))
            ThreePointArc((-1.595708, 18.358856), (-0.8886012188, 18.0659627812), (-0.595708, 17.358856))
            ThreePointArc((-0.595708, 17.358856), (-0.8886012188, 16.6517492188), (-1.595708, 16.358856))
            Line((-1.595708, 16.358856), (-1.595708, 14.358856))
        make_face()
    extrude(amount=F1_DEPTH)


solid = f1.part
